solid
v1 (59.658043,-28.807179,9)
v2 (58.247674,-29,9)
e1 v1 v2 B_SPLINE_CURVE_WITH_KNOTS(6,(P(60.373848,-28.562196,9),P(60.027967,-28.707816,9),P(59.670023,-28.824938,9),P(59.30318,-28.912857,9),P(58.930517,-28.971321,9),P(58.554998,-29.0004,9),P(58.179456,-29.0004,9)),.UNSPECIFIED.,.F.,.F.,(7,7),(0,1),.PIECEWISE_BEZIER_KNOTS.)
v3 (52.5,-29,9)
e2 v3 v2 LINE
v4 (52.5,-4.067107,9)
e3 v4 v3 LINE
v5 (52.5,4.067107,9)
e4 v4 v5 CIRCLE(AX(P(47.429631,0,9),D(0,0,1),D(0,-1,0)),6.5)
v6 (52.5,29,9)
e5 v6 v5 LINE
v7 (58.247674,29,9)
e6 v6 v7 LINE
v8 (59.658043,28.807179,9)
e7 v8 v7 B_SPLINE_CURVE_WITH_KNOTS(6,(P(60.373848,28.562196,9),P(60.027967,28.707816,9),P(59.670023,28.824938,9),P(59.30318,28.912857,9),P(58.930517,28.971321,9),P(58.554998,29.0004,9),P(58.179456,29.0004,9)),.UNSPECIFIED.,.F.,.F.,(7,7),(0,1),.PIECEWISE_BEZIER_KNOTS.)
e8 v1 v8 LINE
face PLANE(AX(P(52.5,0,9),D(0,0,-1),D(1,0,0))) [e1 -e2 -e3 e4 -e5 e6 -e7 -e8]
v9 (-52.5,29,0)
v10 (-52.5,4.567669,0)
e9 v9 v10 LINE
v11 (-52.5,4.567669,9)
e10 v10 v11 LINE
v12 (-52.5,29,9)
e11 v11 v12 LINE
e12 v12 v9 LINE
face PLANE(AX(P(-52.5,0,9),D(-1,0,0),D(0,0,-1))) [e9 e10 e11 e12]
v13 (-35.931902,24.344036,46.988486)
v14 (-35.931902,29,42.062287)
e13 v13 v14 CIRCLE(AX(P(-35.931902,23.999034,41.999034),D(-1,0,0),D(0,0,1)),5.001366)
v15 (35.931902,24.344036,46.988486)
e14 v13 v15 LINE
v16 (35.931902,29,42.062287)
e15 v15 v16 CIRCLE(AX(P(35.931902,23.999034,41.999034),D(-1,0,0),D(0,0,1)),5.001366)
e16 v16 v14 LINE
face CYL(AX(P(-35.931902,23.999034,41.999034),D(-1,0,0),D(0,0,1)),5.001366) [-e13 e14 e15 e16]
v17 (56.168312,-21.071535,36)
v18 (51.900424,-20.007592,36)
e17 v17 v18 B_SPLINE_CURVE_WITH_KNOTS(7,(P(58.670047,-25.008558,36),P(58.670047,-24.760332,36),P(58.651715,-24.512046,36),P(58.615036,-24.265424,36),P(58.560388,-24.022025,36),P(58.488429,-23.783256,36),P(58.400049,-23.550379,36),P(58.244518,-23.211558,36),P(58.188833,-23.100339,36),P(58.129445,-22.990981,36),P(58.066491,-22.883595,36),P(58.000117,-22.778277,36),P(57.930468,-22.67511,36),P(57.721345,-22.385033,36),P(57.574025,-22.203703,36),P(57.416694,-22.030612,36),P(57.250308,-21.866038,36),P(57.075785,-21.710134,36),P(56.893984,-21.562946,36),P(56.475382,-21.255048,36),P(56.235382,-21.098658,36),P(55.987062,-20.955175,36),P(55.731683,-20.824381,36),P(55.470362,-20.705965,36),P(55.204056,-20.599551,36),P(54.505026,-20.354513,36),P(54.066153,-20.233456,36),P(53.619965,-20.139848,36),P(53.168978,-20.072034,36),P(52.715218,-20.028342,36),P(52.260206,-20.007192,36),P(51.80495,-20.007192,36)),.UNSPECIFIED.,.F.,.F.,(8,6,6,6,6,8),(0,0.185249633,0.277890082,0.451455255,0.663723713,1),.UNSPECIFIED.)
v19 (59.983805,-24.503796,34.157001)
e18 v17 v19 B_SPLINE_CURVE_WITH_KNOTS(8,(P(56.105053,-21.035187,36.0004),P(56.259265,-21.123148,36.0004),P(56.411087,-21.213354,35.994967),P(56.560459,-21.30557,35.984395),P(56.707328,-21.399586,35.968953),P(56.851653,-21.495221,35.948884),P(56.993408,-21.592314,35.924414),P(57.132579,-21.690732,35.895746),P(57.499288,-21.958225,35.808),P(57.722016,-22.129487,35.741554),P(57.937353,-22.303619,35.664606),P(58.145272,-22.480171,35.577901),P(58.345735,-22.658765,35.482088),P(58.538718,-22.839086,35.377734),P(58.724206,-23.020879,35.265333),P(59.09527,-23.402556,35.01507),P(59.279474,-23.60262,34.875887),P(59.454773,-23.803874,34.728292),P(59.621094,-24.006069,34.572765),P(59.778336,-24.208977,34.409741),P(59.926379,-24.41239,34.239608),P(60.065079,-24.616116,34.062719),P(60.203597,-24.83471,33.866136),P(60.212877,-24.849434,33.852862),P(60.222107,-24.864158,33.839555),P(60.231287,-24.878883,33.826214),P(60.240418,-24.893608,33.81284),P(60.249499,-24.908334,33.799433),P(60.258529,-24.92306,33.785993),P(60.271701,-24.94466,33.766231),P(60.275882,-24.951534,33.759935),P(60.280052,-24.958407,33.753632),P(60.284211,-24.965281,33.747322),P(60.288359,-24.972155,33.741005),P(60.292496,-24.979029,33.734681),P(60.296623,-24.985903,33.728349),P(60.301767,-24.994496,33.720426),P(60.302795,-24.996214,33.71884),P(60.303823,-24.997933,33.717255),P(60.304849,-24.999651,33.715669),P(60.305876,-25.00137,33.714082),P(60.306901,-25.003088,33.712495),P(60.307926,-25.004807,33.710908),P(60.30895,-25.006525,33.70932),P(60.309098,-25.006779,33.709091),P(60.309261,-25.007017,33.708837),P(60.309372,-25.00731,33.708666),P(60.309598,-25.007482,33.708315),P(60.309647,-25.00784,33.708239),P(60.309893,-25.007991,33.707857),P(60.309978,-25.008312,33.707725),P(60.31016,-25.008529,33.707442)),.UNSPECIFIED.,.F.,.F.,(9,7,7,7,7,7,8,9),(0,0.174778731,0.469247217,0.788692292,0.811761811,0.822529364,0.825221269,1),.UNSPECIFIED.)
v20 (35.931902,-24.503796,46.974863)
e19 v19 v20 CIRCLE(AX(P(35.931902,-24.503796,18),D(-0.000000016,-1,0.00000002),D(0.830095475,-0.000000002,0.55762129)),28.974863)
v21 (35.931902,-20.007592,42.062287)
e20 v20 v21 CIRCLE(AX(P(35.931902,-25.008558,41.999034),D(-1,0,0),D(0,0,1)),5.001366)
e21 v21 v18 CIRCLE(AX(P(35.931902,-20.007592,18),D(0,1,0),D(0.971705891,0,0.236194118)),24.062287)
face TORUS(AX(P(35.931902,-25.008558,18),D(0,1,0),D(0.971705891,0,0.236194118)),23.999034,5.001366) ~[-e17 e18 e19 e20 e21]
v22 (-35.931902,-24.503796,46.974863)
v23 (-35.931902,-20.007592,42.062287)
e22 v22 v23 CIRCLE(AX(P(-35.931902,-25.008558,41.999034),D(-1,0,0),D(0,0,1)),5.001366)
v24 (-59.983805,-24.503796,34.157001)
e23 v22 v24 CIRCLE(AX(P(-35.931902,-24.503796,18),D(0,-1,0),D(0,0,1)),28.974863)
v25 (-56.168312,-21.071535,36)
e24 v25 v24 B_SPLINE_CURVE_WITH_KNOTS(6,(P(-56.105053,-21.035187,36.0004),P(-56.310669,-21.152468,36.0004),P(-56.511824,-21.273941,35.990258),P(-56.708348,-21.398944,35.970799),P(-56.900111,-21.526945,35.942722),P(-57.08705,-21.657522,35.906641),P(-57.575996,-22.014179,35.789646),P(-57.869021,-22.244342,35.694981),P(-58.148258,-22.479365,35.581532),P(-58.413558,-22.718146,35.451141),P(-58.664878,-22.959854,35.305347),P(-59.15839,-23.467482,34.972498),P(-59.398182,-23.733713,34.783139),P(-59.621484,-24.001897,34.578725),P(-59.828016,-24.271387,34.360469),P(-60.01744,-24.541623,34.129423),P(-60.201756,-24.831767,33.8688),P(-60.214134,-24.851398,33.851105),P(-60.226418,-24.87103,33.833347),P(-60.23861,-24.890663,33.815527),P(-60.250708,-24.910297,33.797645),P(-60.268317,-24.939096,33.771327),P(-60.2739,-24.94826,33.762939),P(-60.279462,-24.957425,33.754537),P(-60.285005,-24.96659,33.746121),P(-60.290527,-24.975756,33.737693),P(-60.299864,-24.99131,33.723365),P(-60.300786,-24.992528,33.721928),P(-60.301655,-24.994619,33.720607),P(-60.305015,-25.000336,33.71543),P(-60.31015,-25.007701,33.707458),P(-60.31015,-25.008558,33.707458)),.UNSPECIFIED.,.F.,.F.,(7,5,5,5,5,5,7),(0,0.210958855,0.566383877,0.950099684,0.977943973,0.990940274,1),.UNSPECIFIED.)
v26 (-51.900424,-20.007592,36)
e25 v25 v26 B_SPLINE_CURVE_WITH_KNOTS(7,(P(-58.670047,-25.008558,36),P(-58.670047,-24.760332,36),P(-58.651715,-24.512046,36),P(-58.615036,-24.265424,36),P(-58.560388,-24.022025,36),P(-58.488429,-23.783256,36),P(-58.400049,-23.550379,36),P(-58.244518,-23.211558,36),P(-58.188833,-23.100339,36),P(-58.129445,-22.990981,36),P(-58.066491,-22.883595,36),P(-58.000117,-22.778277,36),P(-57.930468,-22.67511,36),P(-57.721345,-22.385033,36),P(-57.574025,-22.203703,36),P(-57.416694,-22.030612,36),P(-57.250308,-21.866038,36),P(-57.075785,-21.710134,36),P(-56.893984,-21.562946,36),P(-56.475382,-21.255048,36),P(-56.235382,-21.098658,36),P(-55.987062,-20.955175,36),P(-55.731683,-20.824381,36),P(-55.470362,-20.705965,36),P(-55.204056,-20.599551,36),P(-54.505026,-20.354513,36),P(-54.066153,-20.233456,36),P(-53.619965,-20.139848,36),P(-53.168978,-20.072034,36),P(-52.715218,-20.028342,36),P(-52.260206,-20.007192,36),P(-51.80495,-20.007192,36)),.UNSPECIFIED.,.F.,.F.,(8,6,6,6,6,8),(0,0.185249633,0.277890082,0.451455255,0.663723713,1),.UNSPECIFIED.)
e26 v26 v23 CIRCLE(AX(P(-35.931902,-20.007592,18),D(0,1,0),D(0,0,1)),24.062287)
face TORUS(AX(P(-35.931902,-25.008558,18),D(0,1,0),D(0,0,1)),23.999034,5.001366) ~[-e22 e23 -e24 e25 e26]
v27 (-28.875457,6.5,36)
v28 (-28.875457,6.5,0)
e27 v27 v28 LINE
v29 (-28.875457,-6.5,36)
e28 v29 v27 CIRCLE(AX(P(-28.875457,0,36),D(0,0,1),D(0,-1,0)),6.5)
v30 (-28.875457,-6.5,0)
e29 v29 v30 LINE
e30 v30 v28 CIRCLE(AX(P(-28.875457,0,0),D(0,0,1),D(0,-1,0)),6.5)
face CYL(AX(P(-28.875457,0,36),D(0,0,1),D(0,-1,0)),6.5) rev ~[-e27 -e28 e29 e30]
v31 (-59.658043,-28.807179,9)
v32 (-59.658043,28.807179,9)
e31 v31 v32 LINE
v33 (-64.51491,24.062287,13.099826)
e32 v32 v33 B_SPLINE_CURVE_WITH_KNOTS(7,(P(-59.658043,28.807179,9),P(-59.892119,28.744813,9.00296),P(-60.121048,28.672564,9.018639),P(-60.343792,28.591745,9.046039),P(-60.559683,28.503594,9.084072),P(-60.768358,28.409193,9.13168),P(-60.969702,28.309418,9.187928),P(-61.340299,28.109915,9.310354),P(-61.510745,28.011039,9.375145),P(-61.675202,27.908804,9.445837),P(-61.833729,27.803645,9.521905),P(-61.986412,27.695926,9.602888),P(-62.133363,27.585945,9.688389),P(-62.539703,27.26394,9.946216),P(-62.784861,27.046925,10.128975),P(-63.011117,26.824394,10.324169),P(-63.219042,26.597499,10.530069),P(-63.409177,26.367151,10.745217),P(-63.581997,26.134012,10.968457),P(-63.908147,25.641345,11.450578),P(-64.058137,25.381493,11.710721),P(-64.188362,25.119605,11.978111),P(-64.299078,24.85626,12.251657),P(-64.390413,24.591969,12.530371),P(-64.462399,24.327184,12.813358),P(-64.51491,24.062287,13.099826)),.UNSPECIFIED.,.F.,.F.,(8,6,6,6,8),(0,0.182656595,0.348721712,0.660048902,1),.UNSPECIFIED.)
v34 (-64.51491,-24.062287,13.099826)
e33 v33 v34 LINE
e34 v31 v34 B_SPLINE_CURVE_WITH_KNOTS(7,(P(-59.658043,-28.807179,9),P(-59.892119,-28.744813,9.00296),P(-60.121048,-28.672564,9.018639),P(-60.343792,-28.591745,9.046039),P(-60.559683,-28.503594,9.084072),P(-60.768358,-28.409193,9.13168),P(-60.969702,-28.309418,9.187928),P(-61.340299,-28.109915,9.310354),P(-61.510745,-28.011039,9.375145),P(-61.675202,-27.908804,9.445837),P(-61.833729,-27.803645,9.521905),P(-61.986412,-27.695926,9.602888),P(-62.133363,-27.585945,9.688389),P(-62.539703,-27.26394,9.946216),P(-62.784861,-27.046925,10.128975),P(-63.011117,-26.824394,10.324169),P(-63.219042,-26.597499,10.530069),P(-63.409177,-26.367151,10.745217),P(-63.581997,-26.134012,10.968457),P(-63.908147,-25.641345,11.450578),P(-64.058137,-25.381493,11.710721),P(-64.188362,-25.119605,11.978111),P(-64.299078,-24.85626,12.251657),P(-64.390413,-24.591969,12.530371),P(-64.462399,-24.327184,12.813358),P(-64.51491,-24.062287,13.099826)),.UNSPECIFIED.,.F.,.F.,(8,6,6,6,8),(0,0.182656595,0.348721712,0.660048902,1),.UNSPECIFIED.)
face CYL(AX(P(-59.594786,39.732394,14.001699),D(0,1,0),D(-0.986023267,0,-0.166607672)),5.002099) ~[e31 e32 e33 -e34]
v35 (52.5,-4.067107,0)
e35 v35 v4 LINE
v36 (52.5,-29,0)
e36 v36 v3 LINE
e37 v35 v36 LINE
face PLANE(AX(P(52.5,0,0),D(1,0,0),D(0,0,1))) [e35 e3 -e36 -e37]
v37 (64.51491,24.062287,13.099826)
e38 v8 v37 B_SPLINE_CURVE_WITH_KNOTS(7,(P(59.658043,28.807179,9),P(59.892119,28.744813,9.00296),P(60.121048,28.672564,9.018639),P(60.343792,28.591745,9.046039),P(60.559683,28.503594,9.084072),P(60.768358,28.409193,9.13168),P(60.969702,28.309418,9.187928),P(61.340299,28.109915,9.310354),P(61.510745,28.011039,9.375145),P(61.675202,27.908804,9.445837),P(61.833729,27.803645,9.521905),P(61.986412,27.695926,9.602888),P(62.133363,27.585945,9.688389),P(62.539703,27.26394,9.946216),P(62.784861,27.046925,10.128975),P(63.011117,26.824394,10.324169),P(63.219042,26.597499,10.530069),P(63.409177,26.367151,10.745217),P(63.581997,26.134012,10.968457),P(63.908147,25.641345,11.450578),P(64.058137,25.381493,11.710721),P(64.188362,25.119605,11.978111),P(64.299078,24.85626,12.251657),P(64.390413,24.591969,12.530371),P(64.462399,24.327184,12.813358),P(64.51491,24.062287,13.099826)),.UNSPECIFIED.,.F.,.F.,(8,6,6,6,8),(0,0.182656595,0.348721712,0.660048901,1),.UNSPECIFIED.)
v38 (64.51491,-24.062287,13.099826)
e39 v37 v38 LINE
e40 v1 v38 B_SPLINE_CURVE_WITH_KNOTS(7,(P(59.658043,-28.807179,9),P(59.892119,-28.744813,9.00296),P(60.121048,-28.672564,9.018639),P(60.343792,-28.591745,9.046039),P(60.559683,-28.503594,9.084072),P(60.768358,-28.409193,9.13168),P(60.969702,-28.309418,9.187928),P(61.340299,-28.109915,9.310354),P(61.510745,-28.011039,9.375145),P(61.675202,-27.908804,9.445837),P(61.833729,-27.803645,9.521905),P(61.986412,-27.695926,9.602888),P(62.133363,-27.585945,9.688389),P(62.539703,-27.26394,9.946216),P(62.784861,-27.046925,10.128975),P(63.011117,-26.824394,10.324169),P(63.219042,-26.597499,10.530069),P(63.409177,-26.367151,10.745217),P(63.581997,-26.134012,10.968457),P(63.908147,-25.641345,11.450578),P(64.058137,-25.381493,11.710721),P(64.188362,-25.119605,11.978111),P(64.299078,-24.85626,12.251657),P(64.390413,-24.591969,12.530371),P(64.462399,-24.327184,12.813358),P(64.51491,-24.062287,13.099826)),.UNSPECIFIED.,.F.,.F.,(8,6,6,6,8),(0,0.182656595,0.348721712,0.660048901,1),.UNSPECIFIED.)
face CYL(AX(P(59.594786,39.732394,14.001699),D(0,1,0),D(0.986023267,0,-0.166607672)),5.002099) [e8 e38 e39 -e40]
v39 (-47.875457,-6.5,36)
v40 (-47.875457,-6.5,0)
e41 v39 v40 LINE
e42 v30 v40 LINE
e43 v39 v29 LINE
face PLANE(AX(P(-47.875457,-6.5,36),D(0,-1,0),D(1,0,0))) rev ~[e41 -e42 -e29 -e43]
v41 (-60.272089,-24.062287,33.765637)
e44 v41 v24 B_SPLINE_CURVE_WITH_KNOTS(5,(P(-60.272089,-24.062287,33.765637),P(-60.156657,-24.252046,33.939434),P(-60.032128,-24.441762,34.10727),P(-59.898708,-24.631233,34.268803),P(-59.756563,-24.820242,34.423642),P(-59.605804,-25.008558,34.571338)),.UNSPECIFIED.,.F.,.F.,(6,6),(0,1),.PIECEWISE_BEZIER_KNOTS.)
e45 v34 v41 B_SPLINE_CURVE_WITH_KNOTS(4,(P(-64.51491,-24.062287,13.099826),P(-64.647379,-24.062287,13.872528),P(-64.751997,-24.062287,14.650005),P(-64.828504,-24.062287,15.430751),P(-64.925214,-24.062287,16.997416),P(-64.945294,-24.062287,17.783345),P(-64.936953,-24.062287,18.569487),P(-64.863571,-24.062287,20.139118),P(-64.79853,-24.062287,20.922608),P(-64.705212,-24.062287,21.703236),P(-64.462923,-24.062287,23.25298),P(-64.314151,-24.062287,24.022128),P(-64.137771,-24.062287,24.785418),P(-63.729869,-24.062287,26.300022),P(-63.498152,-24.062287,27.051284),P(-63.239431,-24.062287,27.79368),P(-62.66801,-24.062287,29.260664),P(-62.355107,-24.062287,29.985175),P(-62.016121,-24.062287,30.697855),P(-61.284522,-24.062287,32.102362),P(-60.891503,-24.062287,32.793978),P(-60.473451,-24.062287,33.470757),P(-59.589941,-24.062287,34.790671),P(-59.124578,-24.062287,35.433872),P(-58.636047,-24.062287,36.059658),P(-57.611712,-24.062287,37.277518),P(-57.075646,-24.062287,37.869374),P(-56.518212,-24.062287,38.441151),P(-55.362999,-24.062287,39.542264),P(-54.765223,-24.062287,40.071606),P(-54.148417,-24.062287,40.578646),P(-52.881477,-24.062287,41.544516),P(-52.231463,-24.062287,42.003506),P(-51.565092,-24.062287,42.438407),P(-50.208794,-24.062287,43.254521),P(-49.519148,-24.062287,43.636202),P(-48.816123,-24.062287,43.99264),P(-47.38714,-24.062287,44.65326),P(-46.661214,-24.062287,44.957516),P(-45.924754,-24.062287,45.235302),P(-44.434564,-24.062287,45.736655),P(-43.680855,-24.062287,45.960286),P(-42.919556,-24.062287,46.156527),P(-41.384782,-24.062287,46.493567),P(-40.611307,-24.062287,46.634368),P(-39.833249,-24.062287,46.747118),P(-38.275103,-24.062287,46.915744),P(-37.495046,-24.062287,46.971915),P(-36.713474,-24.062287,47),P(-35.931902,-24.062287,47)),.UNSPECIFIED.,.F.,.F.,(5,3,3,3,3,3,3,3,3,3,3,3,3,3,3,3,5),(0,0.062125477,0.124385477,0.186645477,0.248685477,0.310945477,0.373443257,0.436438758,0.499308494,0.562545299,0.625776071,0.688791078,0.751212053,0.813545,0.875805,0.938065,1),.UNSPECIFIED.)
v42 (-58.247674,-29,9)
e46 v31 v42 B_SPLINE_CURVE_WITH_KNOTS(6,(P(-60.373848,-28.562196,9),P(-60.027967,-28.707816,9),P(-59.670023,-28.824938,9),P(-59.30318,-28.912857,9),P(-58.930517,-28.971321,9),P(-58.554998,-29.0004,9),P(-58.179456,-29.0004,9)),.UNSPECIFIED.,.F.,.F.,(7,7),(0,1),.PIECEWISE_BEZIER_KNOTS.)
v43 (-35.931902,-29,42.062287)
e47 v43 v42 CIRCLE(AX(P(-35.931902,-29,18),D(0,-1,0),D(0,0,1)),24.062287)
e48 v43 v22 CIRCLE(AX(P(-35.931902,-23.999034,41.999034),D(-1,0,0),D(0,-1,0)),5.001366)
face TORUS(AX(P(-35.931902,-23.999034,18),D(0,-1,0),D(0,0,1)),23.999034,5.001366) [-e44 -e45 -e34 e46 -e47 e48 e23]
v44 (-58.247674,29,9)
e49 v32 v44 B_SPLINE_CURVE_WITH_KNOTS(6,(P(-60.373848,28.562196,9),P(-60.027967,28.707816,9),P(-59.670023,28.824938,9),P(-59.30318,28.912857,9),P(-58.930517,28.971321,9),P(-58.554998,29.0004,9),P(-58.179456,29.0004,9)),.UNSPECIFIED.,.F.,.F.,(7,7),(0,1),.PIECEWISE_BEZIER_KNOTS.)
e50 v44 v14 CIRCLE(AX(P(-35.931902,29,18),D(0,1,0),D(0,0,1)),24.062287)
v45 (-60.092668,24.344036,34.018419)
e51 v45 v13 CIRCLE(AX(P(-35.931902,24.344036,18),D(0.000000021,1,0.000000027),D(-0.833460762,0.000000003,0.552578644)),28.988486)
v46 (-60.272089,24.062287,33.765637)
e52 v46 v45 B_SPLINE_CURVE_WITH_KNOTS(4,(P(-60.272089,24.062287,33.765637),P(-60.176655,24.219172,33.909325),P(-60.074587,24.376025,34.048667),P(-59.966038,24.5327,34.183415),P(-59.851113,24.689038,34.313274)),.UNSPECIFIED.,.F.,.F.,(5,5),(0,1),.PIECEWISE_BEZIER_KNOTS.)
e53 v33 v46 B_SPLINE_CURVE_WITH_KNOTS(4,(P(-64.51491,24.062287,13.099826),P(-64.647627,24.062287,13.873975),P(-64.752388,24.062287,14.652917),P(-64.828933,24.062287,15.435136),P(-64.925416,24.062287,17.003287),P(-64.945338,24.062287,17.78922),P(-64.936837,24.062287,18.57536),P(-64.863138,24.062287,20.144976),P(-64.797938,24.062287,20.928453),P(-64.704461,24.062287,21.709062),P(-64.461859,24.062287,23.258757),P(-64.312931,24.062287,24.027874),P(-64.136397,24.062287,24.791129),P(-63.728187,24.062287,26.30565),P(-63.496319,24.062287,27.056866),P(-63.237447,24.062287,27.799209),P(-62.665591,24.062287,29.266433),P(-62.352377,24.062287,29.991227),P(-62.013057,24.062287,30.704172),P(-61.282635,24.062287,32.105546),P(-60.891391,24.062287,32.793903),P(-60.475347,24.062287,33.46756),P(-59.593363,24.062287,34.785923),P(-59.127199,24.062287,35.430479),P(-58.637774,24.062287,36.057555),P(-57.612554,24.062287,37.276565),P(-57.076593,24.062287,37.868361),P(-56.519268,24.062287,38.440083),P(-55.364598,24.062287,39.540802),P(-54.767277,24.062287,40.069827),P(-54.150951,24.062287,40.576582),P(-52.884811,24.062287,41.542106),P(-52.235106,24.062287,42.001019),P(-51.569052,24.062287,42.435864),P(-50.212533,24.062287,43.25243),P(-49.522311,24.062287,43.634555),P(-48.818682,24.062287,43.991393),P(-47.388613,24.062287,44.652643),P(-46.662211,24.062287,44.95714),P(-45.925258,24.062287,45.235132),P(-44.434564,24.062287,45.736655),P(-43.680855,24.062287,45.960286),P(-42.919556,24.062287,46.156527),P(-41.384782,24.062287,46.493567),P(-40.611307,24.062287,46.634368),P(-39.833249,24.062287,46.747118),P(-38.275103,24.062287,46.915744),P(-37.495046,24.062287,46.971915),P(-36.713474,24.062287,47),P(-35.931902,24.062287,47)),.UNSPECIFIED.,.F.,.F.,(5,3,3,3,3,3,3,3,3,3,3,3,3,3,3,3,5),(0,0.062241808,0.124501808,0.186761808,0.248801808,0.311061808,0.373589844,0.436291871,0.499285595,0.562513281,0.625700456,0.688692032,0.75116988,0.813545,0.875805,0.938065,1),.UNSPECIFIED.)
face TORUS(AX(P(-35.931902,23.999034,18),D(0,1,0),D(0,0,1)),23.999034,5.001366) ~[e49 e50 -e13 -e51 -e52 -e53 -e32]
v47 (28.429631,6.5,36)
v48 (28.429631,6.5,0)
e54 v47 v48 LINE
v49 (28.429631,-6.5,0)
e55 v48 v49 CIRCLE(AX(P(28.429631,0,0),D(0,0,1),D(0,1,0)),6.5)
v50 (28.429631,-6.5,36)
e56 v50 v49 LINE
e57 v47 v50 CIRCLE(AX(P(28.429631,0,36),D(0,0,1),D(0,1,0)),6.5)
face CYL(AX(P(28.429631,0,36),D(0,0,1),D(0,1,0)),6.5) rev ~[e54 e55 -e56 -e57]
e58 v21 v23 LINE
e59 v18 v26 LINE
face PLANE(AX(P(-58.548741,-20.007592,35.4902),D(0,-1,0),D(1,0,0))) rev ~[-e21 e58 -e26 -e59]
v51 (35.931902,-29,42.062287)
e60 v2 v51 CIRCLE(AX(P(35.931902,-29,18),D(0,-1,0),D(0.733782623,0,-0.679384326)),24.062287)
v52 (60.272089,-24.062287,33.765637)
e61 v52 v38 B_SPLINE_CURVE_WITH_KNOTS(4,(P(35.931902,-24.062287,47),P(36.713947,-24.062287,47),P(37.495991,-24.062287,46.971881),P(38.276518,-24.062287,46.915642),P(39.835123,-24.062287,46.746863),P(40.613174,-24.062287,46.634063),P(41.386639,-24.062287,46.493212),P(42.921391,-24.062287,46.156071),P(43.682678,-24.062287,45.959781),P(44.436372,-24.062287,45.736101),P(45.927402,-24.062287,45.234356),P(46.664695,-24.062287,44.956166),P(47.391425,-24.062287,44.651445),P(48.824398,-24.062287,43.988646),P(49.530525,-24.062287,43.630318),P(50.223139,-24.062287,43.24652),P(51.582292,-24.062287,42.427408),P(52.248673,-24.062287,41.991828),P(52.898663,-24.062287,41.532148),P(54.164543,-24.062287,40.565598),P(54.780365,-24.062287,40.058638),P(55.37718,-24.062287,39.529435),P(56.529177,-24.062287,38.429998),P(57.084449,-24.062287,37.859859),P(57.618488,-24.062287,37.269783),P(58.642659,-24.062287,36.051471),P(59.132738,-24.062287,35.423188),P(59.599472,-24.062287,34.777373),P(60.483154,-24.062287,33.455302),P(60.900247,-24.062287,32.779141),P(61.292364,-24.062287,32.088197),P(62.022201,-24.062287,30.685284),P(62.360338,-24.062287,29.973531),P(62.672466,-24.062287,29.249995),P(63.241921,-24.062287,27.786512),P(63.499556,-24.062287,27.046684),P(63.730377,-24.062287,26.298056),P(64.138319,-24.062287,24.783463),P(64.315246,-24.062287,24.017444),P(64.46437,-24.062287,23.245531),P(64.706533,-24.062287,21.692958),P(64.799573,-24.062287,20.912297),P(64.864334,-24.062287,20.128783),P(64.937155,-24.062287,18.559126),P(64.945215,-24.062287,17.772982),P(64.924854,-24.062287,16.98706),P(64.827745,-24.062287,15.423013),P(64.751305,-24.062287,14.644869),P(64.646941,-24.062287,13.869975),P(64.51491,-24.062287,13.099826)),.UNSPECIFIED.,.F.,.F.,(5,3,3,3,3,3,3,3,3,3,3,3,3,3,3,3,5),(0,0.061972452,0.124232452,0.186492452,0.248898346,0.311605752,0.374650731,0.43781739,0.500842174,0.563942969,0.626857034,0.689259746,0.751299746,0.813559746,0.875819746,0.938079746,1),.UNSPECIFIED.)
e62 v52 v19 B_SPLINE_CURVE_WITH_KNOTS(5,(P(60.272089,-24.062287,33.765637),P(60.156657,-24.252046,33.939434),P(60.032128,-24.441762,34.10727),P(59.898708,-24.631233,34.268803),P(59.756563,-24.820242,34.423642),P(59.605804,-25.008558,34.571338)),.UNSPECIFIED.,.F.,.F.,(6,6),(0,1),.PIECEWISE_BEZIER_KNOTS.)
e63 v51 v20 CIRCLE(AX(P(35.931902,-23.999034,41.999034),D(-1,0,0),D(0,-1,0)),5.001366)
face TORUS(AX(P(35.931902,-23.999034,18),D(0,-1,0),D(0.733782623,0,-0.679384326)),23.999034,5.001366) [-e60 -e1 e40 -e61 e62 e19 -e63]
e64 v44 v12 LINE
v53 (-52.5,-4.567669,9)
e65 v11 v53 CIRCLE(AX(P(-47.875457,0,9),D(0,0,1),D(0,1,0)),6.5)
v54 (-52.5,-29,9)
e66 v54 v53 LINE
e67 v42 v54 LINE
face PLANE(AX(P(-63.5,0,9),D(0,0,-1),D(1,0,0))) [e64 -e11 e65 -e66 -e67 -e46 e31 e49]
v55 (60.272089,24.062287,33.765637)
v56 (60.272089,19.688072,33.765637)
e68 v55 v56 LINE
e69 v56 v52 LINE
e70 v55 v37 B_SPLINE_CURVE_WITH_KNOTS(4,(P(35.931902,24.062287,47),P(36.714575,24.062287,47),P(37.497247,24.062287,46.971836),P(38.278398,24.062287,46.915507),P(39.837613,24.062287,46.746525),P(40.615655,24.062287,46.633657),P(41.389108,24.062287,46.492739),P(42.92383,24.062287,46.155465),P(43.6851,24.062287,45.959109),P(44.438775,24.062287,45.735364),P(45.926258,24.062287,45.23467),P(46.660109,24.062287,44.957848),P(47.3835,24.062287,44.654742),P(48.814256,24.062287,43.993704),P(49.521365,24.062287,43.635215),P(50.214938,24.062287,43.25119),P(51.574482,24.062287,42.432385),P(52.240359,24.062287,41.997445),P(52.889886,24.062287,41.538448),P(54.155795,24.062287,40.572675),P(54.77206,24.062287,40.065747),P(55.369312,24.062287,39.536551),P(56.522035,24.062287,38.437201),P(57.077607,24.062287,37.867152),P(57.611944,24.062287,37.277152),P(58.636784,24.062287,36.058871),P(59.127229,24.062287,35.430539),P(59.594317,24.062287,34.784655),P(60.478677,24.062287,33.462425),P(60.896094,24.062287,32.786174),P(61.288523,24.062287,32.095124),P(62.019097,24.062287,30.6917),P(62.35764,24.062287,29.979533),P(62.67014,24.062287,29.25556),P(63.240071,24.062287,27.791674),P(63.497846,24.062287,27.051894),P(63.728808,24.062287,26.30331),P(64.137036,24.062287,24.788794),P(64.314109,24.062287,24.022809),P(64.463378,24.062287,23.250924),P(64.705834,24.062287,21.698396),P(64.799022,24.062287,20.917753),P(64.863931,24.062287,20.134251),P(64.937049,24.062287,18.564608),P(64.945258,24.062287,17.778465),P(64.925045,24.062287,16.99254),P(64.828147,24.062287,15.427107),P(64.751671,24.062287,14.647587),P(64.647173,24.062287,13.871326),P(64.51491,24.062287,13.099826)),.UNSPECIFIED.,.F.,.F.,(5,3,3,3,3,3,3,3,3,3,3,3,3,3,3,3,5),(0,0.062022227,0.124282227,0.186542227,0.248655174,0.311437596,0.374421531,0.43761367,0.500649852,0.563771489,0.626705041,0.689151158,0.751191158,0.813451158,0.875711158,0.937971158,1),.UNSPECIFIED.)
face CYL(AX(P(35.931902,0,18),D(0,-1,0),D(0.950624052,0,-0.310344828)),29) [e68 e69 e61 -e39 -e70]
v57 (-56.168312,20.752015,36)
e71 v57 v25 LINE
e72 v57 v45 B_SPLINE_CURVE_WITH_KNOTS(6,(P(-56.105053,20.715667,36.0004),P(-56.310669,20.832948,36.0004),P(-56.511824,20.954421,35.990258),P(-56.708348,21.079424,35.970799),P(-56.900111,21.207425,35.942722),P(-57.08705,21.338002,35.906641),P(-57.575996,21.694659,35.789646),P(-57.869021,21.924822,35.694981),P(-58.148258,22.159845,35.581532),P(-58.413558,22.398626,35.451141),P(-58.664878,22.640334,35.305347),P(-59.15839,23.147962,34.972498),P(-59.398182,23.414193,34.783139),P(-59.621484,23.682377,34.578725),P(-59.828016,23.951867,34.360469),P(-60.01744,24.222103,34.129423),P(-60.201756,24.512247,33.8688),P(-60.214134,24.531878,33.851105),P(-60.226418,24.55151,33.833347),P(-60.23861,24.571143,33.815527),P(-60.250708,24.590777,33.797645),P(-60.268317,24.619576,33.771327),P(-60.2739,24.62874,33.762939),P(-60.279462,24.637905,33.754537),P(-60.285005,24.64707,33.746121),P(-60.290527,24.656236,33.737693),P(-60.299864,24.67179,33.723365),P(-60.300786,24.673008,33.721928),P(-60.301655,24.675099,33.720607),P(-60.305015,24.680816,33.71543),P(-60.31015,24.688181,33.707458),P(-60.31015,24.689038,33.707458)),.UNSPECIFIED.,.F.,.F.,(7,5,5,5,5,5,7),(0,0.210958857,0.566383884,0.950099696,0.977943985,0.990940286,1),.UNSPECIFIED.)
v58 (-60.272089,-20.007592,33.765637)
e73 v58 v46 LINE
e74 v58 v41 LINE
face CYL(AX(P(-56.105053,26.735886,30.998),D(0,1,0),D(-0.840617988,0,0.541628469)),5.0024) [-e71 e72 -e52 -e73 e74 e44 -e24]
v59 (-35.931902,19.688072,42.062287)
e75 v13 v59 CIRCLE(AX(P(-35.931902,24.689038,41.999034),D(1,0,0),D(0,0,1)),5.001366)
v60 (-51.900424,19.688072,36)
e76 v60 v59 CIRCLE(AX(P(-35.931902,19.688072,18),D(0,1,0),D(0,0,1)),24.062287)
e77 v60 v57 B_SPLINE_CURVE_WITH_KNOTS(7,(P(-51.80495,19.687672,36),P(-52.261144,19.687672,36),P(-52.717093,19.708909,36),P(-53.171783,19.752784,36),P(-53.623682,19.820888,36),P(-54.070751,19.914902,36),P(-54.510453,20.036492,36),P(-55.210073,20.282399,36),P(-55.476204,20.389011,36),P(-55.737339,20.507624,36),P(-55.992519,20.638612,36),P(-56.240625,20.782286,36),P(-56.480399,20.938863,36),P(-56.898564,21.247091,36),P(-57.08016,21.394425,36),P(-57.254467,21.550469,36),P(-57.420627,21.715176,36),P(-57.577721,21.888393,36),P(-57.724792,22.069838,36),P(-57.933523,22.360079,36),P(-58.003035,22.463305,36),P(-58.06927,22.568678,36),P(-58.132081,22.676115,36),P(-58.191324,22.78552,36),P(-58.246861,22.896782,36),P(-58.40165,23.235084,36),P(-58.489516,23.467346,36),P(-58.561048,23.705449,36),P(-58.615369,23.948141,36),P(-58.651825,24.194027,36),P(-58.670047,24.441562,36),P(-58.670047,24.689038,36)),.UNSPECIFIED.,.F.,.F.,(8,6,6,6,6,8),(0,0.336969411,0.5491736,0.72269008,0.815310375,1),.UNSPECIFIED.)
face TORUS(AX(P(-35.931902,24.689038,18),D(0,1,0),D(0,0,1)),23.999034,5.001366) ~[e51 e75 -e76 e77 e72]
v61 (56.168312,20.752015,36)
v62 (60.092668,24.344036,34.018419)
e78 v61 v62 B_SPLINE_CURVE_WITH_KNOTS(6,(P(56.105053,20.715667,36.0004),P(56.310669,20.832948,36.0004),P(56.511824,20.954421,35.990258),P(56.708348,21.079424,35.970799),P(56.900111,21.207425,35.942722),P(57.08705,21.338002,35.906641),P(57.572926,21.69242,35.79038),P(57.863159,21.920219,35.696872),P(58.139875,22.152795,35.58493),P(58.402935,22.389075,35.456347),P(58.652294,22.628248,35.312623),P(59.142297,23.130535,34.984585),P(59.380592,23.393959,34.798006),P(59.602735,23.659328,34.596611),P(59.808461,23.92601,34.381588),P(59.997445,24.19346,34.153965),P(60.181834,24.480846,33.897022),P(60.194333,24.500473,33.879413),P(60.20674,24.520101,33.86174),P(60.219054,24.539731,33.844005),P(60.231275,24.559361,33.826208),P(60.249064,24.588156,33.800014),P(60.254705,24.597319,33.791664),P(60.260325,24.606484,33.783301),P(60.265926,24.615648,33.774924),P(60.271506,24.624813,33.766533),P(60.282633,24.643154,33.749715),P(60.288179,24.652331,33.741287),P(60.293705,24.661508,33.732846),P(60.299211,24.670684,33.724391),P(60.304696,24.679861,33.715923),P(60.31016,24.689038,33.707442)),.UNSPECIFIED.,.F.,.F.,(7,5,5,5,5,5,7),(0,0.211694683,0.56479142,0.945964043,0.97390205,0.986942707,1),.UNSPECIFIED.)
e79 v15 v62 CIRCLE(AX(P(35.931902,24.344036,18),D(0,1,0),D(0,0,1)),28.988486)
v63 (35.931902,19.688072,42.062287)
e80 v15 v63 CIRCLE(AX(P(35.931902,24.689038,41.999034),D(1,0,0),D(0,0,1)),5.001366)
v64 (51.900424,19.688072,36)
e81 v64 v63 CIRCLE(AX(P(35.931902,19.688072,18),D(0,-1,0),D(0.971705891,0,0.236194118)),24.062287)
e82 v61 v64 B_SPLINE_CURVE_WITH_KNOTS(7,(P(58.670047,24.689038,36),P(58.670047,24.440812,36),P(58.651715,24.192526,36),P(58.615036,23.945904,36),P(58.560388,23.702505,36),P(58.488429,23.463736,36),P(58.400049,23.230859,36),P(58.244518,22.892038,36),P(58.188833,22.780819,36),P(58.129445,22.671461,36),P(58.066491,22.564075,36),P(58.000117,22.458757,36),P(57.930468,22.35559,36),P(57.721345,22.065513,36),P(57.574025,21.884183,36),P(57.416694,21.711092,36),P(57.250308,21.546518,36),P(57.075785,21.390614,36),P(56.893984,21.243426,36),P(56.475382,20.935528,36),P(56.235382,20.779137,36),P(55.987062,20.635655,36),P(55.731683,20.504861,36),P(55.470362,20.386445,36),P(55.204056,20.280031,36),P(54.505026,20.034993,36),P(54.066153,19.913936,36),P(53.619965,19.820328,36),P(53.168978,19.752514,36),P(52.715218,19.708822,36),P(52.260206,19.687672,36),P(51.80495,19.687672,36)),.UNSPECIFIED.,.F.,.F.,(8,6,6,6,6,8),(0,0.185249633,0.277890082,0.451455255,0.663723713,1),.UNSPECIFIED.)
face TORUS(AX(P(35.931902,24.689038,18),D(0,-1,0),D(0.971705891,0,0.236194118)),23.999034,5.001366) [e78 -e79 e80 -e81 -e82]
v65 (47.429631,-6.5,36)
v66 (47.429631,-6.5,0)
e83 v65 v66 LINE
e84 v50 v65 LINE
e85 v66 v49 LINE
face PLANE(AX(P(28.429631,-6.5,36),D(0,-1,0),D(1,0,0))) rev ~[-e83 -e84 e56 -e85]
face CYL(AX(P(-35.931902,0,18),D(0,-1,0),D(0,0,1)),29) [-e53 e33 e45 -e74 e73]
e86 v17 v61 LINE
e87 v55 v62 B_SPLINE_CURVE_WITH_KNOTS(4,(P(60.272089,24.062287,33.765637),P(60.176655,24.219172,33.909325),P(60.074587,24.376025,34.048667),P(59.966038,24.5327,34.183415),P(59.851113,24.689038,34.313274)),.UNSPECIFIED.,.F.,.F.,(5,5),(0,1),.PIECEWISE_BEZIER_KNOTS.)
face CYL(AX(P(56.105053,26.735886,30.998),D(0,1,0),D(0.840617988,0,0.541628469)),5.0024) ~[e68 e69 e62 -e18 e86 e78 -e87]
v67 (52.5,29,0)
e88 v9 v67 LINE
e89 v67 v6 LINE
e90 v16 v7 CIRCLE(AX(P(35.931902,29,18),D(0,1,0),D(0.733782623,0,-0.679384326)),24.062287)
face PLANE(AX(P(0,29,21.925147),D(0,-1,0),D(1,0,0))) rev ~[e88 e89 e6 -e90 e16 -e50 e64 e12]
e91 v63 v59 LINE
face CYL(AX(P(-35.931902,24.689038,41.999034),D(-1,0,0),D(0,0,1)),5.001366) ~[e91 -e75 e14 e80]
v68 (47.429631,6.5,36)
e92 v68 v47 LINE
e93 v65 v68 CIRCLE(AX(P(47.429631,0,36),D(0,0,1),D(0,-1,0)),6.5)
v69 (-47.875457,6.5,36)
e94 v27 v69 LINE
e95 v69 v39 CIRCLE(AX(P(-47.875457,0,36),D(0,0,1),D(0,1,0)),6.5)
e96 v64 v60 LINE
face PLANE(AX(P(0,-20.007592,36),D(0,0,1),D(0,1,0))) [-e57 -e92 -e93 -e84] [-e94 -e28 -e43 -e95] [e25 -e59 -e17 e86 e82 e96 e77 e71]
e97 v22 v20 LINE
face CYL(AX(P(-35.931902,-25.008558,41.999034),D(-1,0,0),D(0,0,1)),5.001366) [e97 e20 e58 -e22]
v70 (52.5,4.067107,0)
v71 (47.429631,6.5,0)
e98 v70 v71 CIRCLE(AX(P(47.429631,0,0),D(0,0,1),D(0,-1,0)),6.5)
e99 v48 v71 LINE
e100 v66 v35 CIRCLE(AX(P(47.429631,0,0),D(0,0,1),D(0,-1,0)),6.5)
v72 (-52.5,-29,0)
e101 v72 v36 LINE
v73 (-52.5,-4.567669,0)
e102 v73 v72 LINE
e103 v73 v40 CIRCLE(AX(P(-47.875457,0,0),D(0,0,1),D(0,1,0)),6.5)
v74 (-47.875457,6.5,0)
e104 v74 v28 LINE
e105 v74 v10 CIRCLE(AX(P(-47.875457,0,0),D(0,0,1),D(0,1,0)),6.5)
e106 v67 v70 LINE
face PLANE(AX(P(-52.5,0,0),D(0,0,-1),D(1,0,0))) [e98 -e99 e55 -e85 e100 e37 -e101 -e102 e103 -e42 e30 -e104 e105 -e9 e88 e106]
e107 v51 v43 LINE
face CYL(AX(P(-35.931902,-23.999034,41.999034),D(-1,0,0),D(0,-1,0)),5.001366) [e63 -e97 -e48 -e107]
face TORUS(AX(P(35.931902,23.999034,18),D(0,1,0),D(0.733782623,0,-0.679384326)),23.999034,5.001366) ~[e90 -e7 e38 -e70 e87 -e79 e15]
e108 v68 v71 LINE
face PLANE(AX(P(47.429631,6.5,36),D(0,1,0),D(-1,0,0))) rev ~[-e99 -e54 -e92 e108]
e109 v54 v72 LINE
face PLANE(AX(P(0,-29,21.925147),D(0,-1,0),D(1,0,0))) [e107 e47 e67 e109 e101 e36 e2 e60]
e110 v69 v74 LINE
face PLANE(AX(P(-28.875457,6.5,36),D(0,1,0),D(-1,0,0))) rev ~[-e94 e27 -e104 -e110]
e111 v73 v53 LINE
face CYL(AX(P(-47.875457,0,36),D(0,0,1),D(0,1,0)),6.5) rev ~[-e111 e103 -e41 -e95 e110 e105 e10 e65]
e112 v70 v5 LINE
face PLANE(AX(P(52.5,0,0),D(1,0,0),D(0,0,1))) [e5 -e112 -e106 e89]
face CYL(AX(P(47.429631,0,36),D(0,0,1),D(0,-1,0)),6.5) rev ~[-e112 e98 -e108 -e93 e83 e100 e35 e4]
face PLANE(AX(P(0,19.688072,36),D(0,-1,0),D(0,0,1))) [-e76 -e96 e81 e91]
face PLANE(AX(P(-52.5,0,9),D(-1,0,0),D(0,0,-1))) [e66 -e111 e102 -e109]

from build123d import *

# Parameters (mm, degrees)
F1_DEPTH      = 29
F2_W          = 39.6956643381
F2_H          = 11
F3_DEPTH      = 64.9329024958
F3_DEPTH_BACK = 94
F5_DEPTH      = 36.001
F6_T1_DEPTH   = 71.8638049916
F6_T3_DEPTH   = 39.6956643381
F6_T5_DEPTH   = 79.4647888213
F6_T10_ANGLE  = 76.3379776267
F6_T15_ANGLE  = 76.3379776267
F6_T18_ANGLE  = 132.7955508157
F6_T20_ANGLE  = 132.7955508157
F6_T22_ANGLE  = 132.7955508157
F6_T26_ANGLE  = 76.3379776267
F6_T31_ANGLE  = 76.3379776267
F6_T34_ANGLE  = 132.7955508157
F6_T39_ANGLE  = 76.3379776267
F6_T43_DEPTH  = 46.7434777317
F6_T50_DEPTH  = 46.7434777317
F6_T54_ANGLE  = 76.3379776267
F6_T61_ANGLE  = 76.3379776267
F6_T65_DEPTH  = 46.7434777317
F6_T72_DEPTH  = 46.7434777317
F6_T76_ANGLE  = 76.3379776267


# Not quite as in the source:
# - a fillet or chamfer that OpenCascade refuses, or shapes differently, is made with other operations: its cross-section is extruded or revolved along the edge and cut away or added


with BuildPart() as f1:
    # F0 (on Front) → F1 (new body, symmetric)
    with BuildSketch(Plane.XZ):
        with BuildLine():
            Line((-52.5, 9), (-52.5, 0))
            Line((-52.5, 0), (52.5, 0))
            Line((52.5, 0), (52.5, 9))
            Line((52.5, 9), (63.5, 9))
            ThreePointArc((63.5, 9), (59.4052916844, 35.0293863659), (35.9319024958, 47))
            Line((35.9319024958, 47), (-35.9319024958, 47))
            ThreePointArc((-35.9319024958, 47), (-59.4052916844, 35.0293863659), (-63.5, 9))
            Line((-63.5, 9), (-52.5, 9))
        make_face()
    extrude(amount=F1_DEPTH, both=True)

    # F2 (on Right) → F3 (cut, two sides)
    with BuildSketch(Plane.YZ) as f3_sk:
        with Locations((-0.1597600058, 41.5)):
            Rectangle(F2_W, F2_H)
    extrude(amount=-F3_DEPTH, mode=Mode.SUBTRACT)
    extrude(f3_sk.sketch, amount=F3_DEPTH_BACK, mode=Mode.SUBTRACT)

    # F4 (on face) → F5 (cut, through all)
    with BuildSketch(Plane.XY.offset(36)):
        with BuildLine():
            Line((-47.8754565308, -6.5), (-28.8754565308, -6.5))
            ThreePointArc((-28.8754565308, -6.5), (-22.3754565308, 0), (-28.8754565308, 6.5))
            Line((-28.8754565308, 6.5), (-47.8754565308, 6.5))
            ThreePointArc((-47.8754565308, 6.5), (-54.3754565308, 0), (-47.8754565308, -6.5))
        make_face()
        with BuildLine():
            Line((28.4296313102, -6.5), (47.4296313102, -6.5))
            ThreePointArc((47.4296313102, -6.5), (53.9296313102, 0), (47.4296313102, 6.5))
            Line((47.4296313102, 6.5), (28.4296313102, 6.5))
            ThreePointArc((28.4296313102, 6.5), (21.9296313102, 0), (28.4296313102, -6.5))
        make_face()
    extrude(amount=-F5_DEPTH, mode=Mode.SUBTRACT)

    # F6: fillet of radius 5 on 18 edges, made by hand

    # F6_s2 → F6_t1 (cut)
    with BuildSketch(Plane.YZ.offset(-35.9319024958)):
        with BuildLine():
            ThreePointArc((24.6890378487, 47.0004), (21.1525382574, 45.5355339059), (19.6876721633, 41.9990343146))
            Line((19.6876721633, 41.9990343146), (19.1875355947, 41.9990343146))
            ThreePointArc((19.1875355947, 41.9990343146), (19.1879355947, 44.4995171573), (19.1879355947, 47))
            Line((19.1879355947, 47), (19.6880721633, 47.5001365685))
            ThreePointArc((19.6880721633, 47.5001365685), (22.188555006, 47.5001365685), (24.6890378487, 47.5005365685))
            Line((24.6890378487, 47.5005365685), (24.6890378487, 47.0004))
        make_face()
        with BuildLine():
            ThreePointArc((23.9990343146, 47.0004), (27.5355339059, 45.5355339059), (29.0004, 41.9990343146))
            Line((29.0004, 41.9990343146), (29.5005365685, 41.9990343146))
            ThreePointArc((29.5005365685, 41.9990343146), (29.5001365685, 44.4995171573), (29.5001365685, 47))
            Line((29.5001365685, 47), (29, 47.5001365685))
            ThreePointArc((29, 47.5001365685), (26.4995171573, 47.5001365685), (23.9990343146, 47.5005365685))
            Line((23.9990343146, 47.5005365685), (23.9990343146, 47.0004))
        make_face()
        with BuildLine():
            ThreePointArc((-25.0085578603, 47.0004), (-21.4720582689, 45.5355339059), (-20.0071921748, 41.9990343146))
            Line((-20.0071921748, 41.9990343146), (-19.5070556063, 41.9990343146))
            ThreePointArc((-19.5070556063, 41.9990343146), (-19.5074556063, 44.4995171573), (-19.5074556063, 47))
            Line((-19.5074556063, 47), (-20.0075921748, 47.5001365685))
            ThreePointArc((-20.0075921748, 47.5001365685), (-22.5080750175, 47.5001365685), (-25.0085578603, 47.5005365685))
            Line((-25.0085578603, 47.5005365685), (-25.0085578603, 47.0004))
        make_face()
        with BuildLine():
            ThreePointArc((-29.0004, 41.9990343146), (-27.5355339059, 45.5355339059), (-23.9990343146, 47.0004))
            Line((-23.9990343146, 47.0004), (-23.9990343146, 47.5005365685))
            ThreePointArc((-23.9990343146, 47.5005365685), (-26.4995171573, 47.5001365685), (-29, 47.5001365685))
            Line((-29, 47.5001365685), (-29.5001365685, 47))
            ThreePointArc((-29.5001365685, 47), (-29.5001365685, 44.4995171573), (-29.5005365685, 41.9990343146))
            Line((-29.5005365685, 41.9990343146), (-29.0004, 41.9990343146))
        make_face()
    extrude(amount=F6_T1_DEPTH, mode=Mode.SUBTRACT)

    # F6_s4 → F6_t3 (cut)
    with BuildSketch(Plane.XZ.offset(-19.6880721633)):
        with BuildLine():
            ThreePointArc((-60.3101603912, 33.7074422535), (-58.4998694367, 35.3899084513), (-56.1050529687, 36.0004))
            Line((-56.1050529687, 36.0004), (-56.1050529687, 36.50064))
            ThreePointArc((-56.1050529687, 36.50064), (-57.3872947331, 36.50024), (-58.6695364976, 36.50024))
            Line((-58.6695364976, 36.50024), (-59.0617528436, 36.3104937931))
            ThreePointArc((-59.0617528436, 36.3104937931), (-59.9244071951, 35.1646112194), (-60.7306711334, 33.9783864789))
            Line((-60.7306711334, 33.9783864789), (-60.3101603912, 33.7074422535))
        make_face()
        with BuildLine():
            ThreePointArc((60.3101603912, 33.7074422535), (58.4998694367, 35.3899084513), (56.1050529687, 36.0004))
            Line((56.1050529687, 36.0004), (56.1050529687, 36.50064))
            ThreePointArc((56.1050529687, 36.50064), (57.3872947331, 36.50024), (58.6695364976, 36.50024))
            Line((58.6695364976, 36.50024), (59.0617528436, 36.3104937931))
            ThreePointArc((59.0617528436, 36.3104937931), (59.9244071951, 35.1646112194), (60.7306711334, 33.9783864789))
            Line((60.7306711334, 33.9783864789), (60.3101603912, 33.7074422535))
        make_face()
    extrude(amount=F6_T3_DEPTH, mode=Mode.SUBTRACT)

    # F6_s6 → F6_t5 (cut)
    with BuildSketch(Plane.XZ.offset(-39.7323944107)):
        with BuildLine():
            ThreePointArc((-64.526971658, 13.1683108784), (-62.8237409902, 10.1813793629), (-59.594785722, 8.9996))
            Line((-59.594785722, 8.9996), (-59.594785722, 8.4993901064))
            ThreePointArc((-59.594785722, 8.4993901064), (-61.547392861, 8.4997901064), (-63.5, 8.4997901064))
            Line((-63.5, 8.4997901064), (-63.9755115558, 8.8447624468))
            ThreePointArc((-63.9755115558, 8.8447624468), (-64.576227141, 10.945565268), (-65.0201902516, 13.0849720727))
            Line((-65.0201902516, 13.0849720727), (-64.526971658, 13.1683108784))
        make_face()
        with BuildLine():
            ThreePointArc((64.526971658, 13.1683108784), (62.8237409902, 10.1813793629), (59.594785722, 8.9996))
            Line((59.594785722, 8.9996), (59.594785722, 8.4993901064))
            ThreePointArc((59.594785722, 8.4993901064), (61.547392861, 8.4997901064), (63.5, 8.4997901064))
            Line((63.5, 8.4997901064), (63.9755115558, 8.8447624468))
            ThreePointArc((63.9755115558, 8.8447624468), (64.576227141, 10.945565268), (65.0201902516, 13.0849720727))
            Line((65.0201902516, 13.0849720727), (64.526971658, 13.1683108784))
        make_face()
    extrude(amount=F6_T5_DEPTH, mode=Mode.SUBTRACT)


with BuildPart() as f6_tool8:
    # F6_s9 → F6_t10 (revolve)
    with BuildSketch(Plane.YZ.offset(-35.9319024958)):
        with BuildLine():
            ThreePointArc((19.6876721633, 41.9990343146), (21.1525382574, 45.5355339059), (24.6890378487, 47.0004))
            Line((24.6890378487, 47.0004), (24.6890378487, 47.5005365685))
            ThreePointArc((24.6890378487, 47.5005365685), (22.188555006, 47.5001365685), (19.6880721633, 47.5001365685))
            Line((19.6880721633, 47.5001365685), (19.1879355947, 47))
            ThreePointArc((19.1879355947, 47), (19.1879355947, 44.4995171573), (19.1875355947, 41.9990343146))
            Line((19.1875355947, 41.9990343146), (19.6876721633, 41.9990343146))
        make_face()
    revolve(axis=Axis((-35.9319024958, 19.6880721633, 18), (0, -1, 0)), revolution_arc=F6_T10_ANGLE)

    split(bisect_by=Plane.XY.offset(36), keep=Keep.TOP)


with BuildPart() as f1_1:
    add(f1.part)

    # F6_t7: cut F6_tool8
    add(f6_tool8.part, mode=Mode.SUBTRACT)


with BuildPart() as f6_tool13:
    # F6_s14 → F6_t15 (revolve)
    with BuildSketch(Plane.YZ.offset(-35.9319024958)):
        with BuildLine():
            ThreePointArc((-25.0085578603, 47.0004), (-21.4720582689, 45.5355339059), (-20.0071921748, 41.9990343146))
            Line((-20.0071921748, 41.9990343146), (-19.5070556063, 41.9990343146))
            ThreePointArc((-19.5070556063, 41.9990343146), (-19.5074556063, 44.4995171573), (-19.5074556063, 47))
            Line((-19.5074556063, 47), (-20.0075921748, 47.5001365685))
            ThreePointArc((-20.0075921748, 47.5001365685), (-22.5080750175, 47.5001365685), (-25.0085578603, 47.5005365685))
            Line((-25.0085578603, 47.5005365685), (-25.0085578603, 47.0004))
        make_face()
    revolve(axis=Axis((-35.9319024958, -20.0075921748, 18), (0, -1, 0)), revolution_arc=F6_T15_ANGLE)

    split(bisect_by=Plane.XY.offset(36), keep=Keep.TOP)


with BuildPart() as f1_2:
    add(f1_1.part)

    # F6_t12: cut F6_tool13
    add(f6_tool13.part, mode=Mode.SUBTRACT)

    # F6_s17 → F6_t18 (revolve, cut)
    with BuildSketch(Plane.YZ.offset(-35.9319024958)):
        with BuildLine():
            ThreePointArc((-23.9990343146, 47.0004), (-27.5355339059, 45.5355339059), (-29.0004, 41.9990343146))
            Line((-29.0004, 41.9990343146), (-29.5005365685, 41.9990343146))
            ThreePointArc((-29.5005365685, 41.9990343146), (-29.5001365685, 44.4995171573), (-29.5001365685, 47))
            Line((-29.5001365685, 47), (-29, 47.5001365685))
            ThreePointArc((-29, 47.5001365685), (-26.4995171573, 47.5001365685), (-23.9990343146, 47.5005365685))
            Line((-23.9990343146, 47.5005365685), (-23.9990343146, 47.0004))
        make_face()
    revolve(axis=Axis((-35.9319024958, -29, 18), (0, -1, 0)), revolution_arc=F6_T18_ANGLE, mode=Mode.SUBTRACT)

    # F6_s19 → F6_t20 (revolve, cut)
    with BuildSketch(Plane.YZ.offset(-35.9319024958)):
        with BuildLine():
            ThreePointArc((23.9990343146, 47.0004), (27.5355339059, 45.5355339059), (29.0004, 41.9990343146))
            Line((29.0004, 41.9990343146), (29.5005365685, 41.9990343146))
            ThreePointArc((29.5005365685, 41.9990343146), (29.5001365685, 44.4995171573), (29.5001365685, 47))
            Line((29.5001365685, 47), (29, 47.5001365685))
            ThreePointArc((29, 47.5001365685), (26.4995171573, 47.5001365685), (23.9990343146, 47.5005365685))
            Line((23.9990343146, 47.5005365685), (23.9990343146, 47.0004))
        make_face()
    revolve(axis=Axis((-35.9319024958, 29, 18), (0, -1, 0)), revolution_arc=F6_T20_ANGLE, mode=Mode.SUBTRACT)

    # F6_s21 → F6_t22 (revolve, cut)
    with BuildSketch(Plane(origin=(25.5582063795, 0, 27.6046517371), x_dir=(0, 1, 0), z_dir=(-0.679384326, 0, -0.7337826229))):
        with BuildLine():
            ThreePointArc((-23.9990343146, 43.1376877916), (-27.5355339059, 41.6728216976), (-29.0004, 38.1363221062))
            Line((-29.0004, 38.1363221062), (-29.5005365685, 38.1363221062))
            ThreePointArc((-29.5005365685, 38.1363221062), (-29.5001365685, 40.6368049489), (-29.5001365685, 43.1372877916))
            Line((-29.5001365685, 43.1372877916), (-29, 43.6374243602))
            ThreePointArc((-29, 43.6374243602), (-26.4995171573, 43.6374243602), (-23.9990343146, 43.6378243602))
            Line((-23.9990343146, 43.6378243602), (-23.9990343146, 43.1376877916))
        make_face()
    revolve(axis=Axis((35.9319024958, -29, 18), (0, -1, 0)), revolution_arc=F6_T22_ANGLE, mode=Mode.SUBTRACT)


with BuildPart() as f6_tool24:
    # F6_s25 → F6_t26 (revolve)
    with BuildSketch(Plane(origin=(-2.1266450769, 0, 8.7490474774), x_dir=(0, 1, 0), z_dir=(0.2361941177, 0, -0.9717058911))):
        with BuildLine():
            ThreePointArc((-25.0085578603, 68.1671354515), (-21.4720582689, 66.7022693574), (-20.0071921748, 63.165769766))
            Line((-20.0071921748, 63.165769766), (-19.5070556063, 63.165769766))
            ThreePointArc((-19.5070556063, 63.165769766), (-19.5074556063, 65.6662526087), (-19.5074556063, 68.1667354515))
            Line((-19.5074556063, 68.1667354515), (-20.0075921748, 68.66687202))
            ThreePointArc((-20.0075921748, 68.66687202), (-22.5080750175, 68.66687202), (-25.0085578603, 68.66727202))
            Line((-25.0085578603, 68.66727202), (-25.0085578603, 68.1671354515))
        make_face()
    revolve(axis=Axis((35.9319024958, -20.0075921748, 18), (0, -1, 0)), revolution_arc=F6_T26_ANGLE)

    split(bisect_by=Plane.XY.offset(36), keep=Keep.TOP)


with BuildPart() as f1_3:
    add(f1_2.part)

    # F6_t23: cut F6_tool24
    add(f6_tool24.part, mode=Mode.SUBTRACT)


with BuildPart() as f6_tool29:
    # F6_s30 → F6_t31 (revolve)
    with BuildSketch(Plane(origin=(-2.1266450769, 0, 8.7490474774), x_dir=(0, 1, 0), z_dir=(0.2361941177, 0, -0.9717058911))):
        with BuildLine():
            ThreePointArc((24.6890378487, 68.1671354515), (21.1525382574, 66.7022693574), (19.6876721633, 63.165769766))
            Line((19.6876721633, 63.165769766), (19.1875355947, 63.165769766))
            ThreePointArc((19.1875355947, 63.165769766), (19.1879355947, 65.6662526087), (19.1879355947, 68.1667354515))
            Line((19.1879355947, 68.1667354515), (19.6880721633, 68.66687202))
            ThreePointArc((19.6880721633, 68.66687202), (22.188555006, 68.66687202), (24.6890378487, 68.66727202))
            Line((24.6890378487, 68.66727202), (24.6890378487, 68.1671354515))
        make_face()
    revolve(axis=Axis((35.9319024958, 19.6880721633, 18), (0, -1, 0)), revolution_arc=F6_T31_ANGLE)

    split(bisect_by=Plane.XY.offset(36), keep=Keep.TOP)


with BuildPart() as f1_4:
    add(f1_3.part)

    # F6_t28: cut F6_tool29
    add(f6_tool29.part, mode=Mode.SUBTRACT)

    # F6_s33 → F6_t34 (revolve, cut)
    with BuildSketch(Plane(origin=(25.5582063795, 0, 27.6046517371), x_dir=(0, 1, 0), z_dir=(-0.679384326, 0, -0.7337826229))):
        with BuildLine():
            ThreePointArc((23.9990343146, 43.1376877916), (27.5355339059, 41.6728216976), (29.0004, 38.1363221062))
            Line((29.0004, 38.1363221062), (29.5005365685, 38.1363221062))
            ThreePointArc((29.5005365685, 38.1363221062), (29.5001365685, 40.6368049489), (29.5001365685, 43.1372877916))
            Line((29.5001365685, 43.1372877916), (29, 43.6374243602))
            ThreePointArc((29, 43.6374243602), (26.4995171573, 43.6374243602), (23.9990343146, 43.6378243602))
            Line((23.9990343146, 43.6378243602), (23.9990343146, 43.1376877916))
        make_face()
    revolve(axis=Axis((35.9319024958, 29, 18), (0, -1, 0)), revolution_arc=F6_T34_ANGLE, mode=Mode.SUBTRACT)


with BuildPart() as f6_tool37:
    # F6_s38 → F6_t39 (revolve)
    with BuildSketch(Plane.YZ.offset(-35.9319024958)):
        with BuildLine():
            ThreePointArc((19.6876721633, 41.9990343146), (21.1525382574, 45.5355339059), (24.6890378487, 47.0004))
            Line((24.6890378487, 47.0004), (24.6890378487, 47.5005365685))
            ThreePointArc((24.6890378487, 47.5005365685), (22.188555006, 47.5001365685), (19.6880721633, 47.5001365685))
            Line((19.6880721633, 47.5001365685), (19.1879355947, 47))
            ThreePointArc((19.1879355947, 47), (19.1879355947, 44.4995171573), (19.1875355947, 41.9990343146))
            Line((19.1875355947, 41.9990343146), (19.6876721633, 41.9990343146))
        make_face()
    revolve(axis=Axis((-35.9319024958, 19.6880721633, 18), (0, -1, 0)), revolution_arc=F6_T39_ANGLE)

    split(bisect_by=Plane.XY.offset(36), keep=Keep.BOTTOM)


with BuildPart() as f6_tool41:
    # F6_s42 → F6_t43 (new body)
    with BuildSketch(Plane.XZ.offset(-26.7358855569)):
        with BuildLine():
            ThreePointArc((-60.3101603912, 33.7074422535), (-58.4998694367, 35.3899084513), (-56.1050529687, 36.0004))
            Line((-56.1050529687, 36.0004), (-56.1050529687, 36.50064))
            ThreePointArc((-56.1050529687, 36.50064), (-57.3872947331, 36.50024), (-58.6695364976, 36.50024))
            Line((-58.6695364976, 36.50024), (-59.0617528436, 36.3104937931))
            ThreePointArc((-59.0617528436, 36.3104937931), (-59.9244071951, 35.1646112194), (-60.7306711334, 33.9783864789))
            Line((-60.7306711334, 33.9783864789), (-60.3101603912, 33.7074422535))
        make_face()
    extrude(amount=F6_T43_DEPTH)

    split(bisect_by=Plane.XZ.offset(-19.6880721633), keep=Keep.BOTTOM)


with BuildPart() as f6_tool37_1:
    add(f6_tool37.part)

    # F6_t45: intersect F6_tool41
    add(f6_tool41.part, mode=Mode.INTERSECT)


with BuildPart() as f1_5:
    add(f1_4.part)

    # F6_t35: cut F6_tool37
    add(f6_tool37_1.part, mode=Mode.SUBTRACT)


with BuildPart() as f6_tool48:
    # F6_s49 → F6_t50 (new body)
    with BuildSketch(Plane.XZ.offset(-19.6880721633)):
        with BuildLine():
            ThreePointArc((-60.3101603912, 33.7074422535), (-58.4998694367, 35.3899084513), (-56.1050529687, 36.0004))
            Line((-56.1050529687, 36.0004), (-56.1050529687, 36.50064))
            ThreePointArc((-56.1050529687, 36.50064), (-57.3872947331, 36.50024), (-58.6695364976, 36.50024))
            Line((-58.6695364976, 36.50024), (-59.0617528436, 36.3104937931))
            ThreePointArc((-59.0617528436, 36.3104937931), (-59.9244071951, 35.1646112194), (-60.7306711334, 33.9783864789))
            Line((-60.7306711334, 33.9783864789), (-60.3101603912, 33.7074422535))
        make_face()
    extrude(amount=F6_T50_DEPTH)

    split(bisect_by=Plane.XZ.offset(20.0075921748), keep=Keep.TOP)


with BuildPart() as f6_tool52:
    # F6_s53 → F6_t54 (revolve)
    with BuildSketch(Plane.YZ.offset(-35.9319024958)):
        with BuildLine():
            ThreePointArc((-25.0085578603, 47.0004), (-21.4720582689, 45.5355339059), (-20.0071921748, 41.9990343146))
            Line((-20.0071921748, 41.9990343146), (-19.5070556063, 41.9990343146))
            ThreePointArc((-19.5070556063, 41.9990343146), (-19.5074556063, 44.4995171573), (-19.5074556063, 47))
            Line((-19.5074556063, 47), (-20.0075921748, 47.5001365685))
            ThreePointArc((-20.0075921748, 47.5001365685), (-22.5080750175, 47.5001365685), (-25.0085578603, 47.5005365685))
            Line((-25.0085578603, 47.5005365685), (-25.0085578603, 47.0004))
        make_face()
    revolve(axis=Axis((-35.9319024958, -20.0075921748, 18), (0, -1, 0)), revolution_arc=F6_T54_ANGLE)

    split(bisect_by=Plane.XY.offset(36), keep=Keep.BOTTOM)


with BuildPart() as f6_tool48_1:
    add(f6_tool48.part)

    # F6_t56: intersect F6_tool52
    add(f6_tool52.part, mode=Mode.INTERSECT)


with BuildPart() as f1_6:
    add(f1_5.part)

    # F6_t46: cut F6_tool48
    add(f6_tool48_1.part, mode=Mode.SUBTRACT)


with BuildPart() as f6_tool59:
    # F6_s60 → F6_t61 (revolve)
    with BuildSketch(Plane(origin=(-2.1266450769, 0, 8.7490474774), x_dir=(0, 1, 0), z_dir=(0.2361941177, 0, -0.9717058911))):
        with BuildLine():
            ThreePointArc((-25.0085578603, 68.1671354515), (-21.4720582689, 66.7022693574), (-20.0071921748, 63.165769766))
            Line((-20.0071921748, 63.165769766), (-19.5070556063, 63.165769766))
            ThreePointArc((-19.5070556063, 63.165769766), (-19.5074556063, 65.6662526087), (-19.5074556063, 68.1667354515))
            Line((-19.5074556063, 68.1667354515), (-20.0075921748, 68.66687202))
            ThreePointArc((-20.0075921748, 68.66687202), (-22.5080750175, 68.66687202), (-25.0085578603, 68.66727202))
            Line((-25.0085578603, 68.66727202), (-25.0085578603, 68.1671354515))
        make_face()
    revolve(axis=Axis((35.9319024958, -20.0075921748, 18), (0, -1, 0)), revolution_arc=F6_T61_ANGLE)

    split(bisect_by=Plane.XY.offset(36), keep=Keep.BOTTOM)


with BuildPart() as f6_tool63:
    # F6_s64 → F6_t65 (new body)
    with BuildSketch(Plane.XZ.offset(-19.6880721633)):
        with BuildLine():
            ThreePointArc((60.3101603912, 33.7074422535), (58.4998694367, 35.3899084513), (56.1050529687, 36.0004))
            Line((56.1050529687, 36.0004), (56.1050529687, 36.50064))
            ThreePointArc((56.1050529687, 36.50064), (57.3872947331, 36.50024), (58.6695364976, 36.50024))
            Line((58.6695364976, 36.50024), (59.0617528436, 36.3104937931))
            ThreePointArc((59.0617528436, 36.3104937931), (59.9244071951, 35.1646112194), (60.7306711334, 33.9783864789))
            Line((60.7306711334, 33.9783864789), (60.3101603912, 33.7074422535))
        make_face()
    extrude(amount=F6_T65_DEPTH)

    split(bisect_by=Plane.XZ.offset(20.0075921748), keep=Keep.TOP)


with BuildPart() as f6_tool59_1:
    add(f6_tool59.part)

    # F6_t67: intersect F6_tool63
    add(f6_tool63.part, mode=Mode.INTERSECT)


with BuildPart() as f1_7:
    add(f1_6.part)

    # F6_t57: cut F6_tool59
    add(f6_tool59_1.part, mode=Mode.SUBTRACT)


with BuildPart() as f6_tool70:
    # F6_s71 → F6_t72 (new body)
    with BuildSketch(Plane.XZ.offset(-26.7358855569)):
        with BuildLine():
            ThreePointArc((60.3101603912, 33.7074422535), (58.4998694367, 35.3899084513), (56.1050529687, 36.0004))
            Line((56.1050529687, 36.0004), (56.1050529687, 36.50064))
            ThreePointArc((56.1050529687, 36.50064), (57.3872947331, 36.50024), (58.6695364976, 36.50024))
            Line((58.6695364976, 36.50024), (59.0617528436, 36.3104937931))
            ThreePointArc((59.0617528436, 36.3104937931), (59.9244071951, 35.1646112194), (60.7306711334, 33.9783864789))
            Line((60.7306711334, 33.9783864789), (60.3101603912, 33.7074422535))
        make_face()
    extrude(amount=F6_T72_DEPTH)

    split(bisect_by=Plane.XZ.offset(-19.6880721633), keep=Keep.BOTTOM)


with BuildPart() as f6_tool74:
    # F6_s75 → F6_t76 (revolve)
    with BuildSketch(Plane(origin=(-2.1266450769, 0, 8.7490474774), x_dir=(0, 1, 0), z_dir=(0.2361941177, 0, -0.9717058911))):
        with BuildLine():
            ThreePointArc((24.6890378487, 68.1671354515), (21.1525382574, 66.7022693574), (19.6876721633, 63.165769766))
            Line((19.6876721633, 63.165769766), (19.1875355947, 63.165769766))
            ThreePointArc((19.1875355947, 63.165769766), (19.1879355947, 65.6662526087), (19.1879355947, 68.1667354515))
            Line((19.1879355947, 68.1667354515), (19.6880721633, 68.66687202))
            ThreePointArc((19.6880721633, 68.66687202), (22.188555006, 68.66687202), (24.6890378487, 68.66727202))
            Line((24.6890378487, 68.66727202), (24.6890378487, 68.1671354515))
        make_face()
    revolve(axis=Axis((35.9319024958, 19.6880721633, 18), (0, -1, 0)), revolution_arc=F6_T76_ANGLE)

    split(bisect_by=Plane.XY.offset(36), keep=Keep.BOTTOM)


with BuildPart() as f6_tool70_1:
    add(f6_tool70.part)

    # F6_t78: intersect F6_tool74
    add(f6_tool74.part, mode=Mode.INTERSECT)


with BuildPart() as f1_8:
    add(f1_7.part)

    # F6_t68: cut F6_tool70
    add(f6_tool70_1.part, mode=Mode.SUBTRACT)


solid = f1_8.part
